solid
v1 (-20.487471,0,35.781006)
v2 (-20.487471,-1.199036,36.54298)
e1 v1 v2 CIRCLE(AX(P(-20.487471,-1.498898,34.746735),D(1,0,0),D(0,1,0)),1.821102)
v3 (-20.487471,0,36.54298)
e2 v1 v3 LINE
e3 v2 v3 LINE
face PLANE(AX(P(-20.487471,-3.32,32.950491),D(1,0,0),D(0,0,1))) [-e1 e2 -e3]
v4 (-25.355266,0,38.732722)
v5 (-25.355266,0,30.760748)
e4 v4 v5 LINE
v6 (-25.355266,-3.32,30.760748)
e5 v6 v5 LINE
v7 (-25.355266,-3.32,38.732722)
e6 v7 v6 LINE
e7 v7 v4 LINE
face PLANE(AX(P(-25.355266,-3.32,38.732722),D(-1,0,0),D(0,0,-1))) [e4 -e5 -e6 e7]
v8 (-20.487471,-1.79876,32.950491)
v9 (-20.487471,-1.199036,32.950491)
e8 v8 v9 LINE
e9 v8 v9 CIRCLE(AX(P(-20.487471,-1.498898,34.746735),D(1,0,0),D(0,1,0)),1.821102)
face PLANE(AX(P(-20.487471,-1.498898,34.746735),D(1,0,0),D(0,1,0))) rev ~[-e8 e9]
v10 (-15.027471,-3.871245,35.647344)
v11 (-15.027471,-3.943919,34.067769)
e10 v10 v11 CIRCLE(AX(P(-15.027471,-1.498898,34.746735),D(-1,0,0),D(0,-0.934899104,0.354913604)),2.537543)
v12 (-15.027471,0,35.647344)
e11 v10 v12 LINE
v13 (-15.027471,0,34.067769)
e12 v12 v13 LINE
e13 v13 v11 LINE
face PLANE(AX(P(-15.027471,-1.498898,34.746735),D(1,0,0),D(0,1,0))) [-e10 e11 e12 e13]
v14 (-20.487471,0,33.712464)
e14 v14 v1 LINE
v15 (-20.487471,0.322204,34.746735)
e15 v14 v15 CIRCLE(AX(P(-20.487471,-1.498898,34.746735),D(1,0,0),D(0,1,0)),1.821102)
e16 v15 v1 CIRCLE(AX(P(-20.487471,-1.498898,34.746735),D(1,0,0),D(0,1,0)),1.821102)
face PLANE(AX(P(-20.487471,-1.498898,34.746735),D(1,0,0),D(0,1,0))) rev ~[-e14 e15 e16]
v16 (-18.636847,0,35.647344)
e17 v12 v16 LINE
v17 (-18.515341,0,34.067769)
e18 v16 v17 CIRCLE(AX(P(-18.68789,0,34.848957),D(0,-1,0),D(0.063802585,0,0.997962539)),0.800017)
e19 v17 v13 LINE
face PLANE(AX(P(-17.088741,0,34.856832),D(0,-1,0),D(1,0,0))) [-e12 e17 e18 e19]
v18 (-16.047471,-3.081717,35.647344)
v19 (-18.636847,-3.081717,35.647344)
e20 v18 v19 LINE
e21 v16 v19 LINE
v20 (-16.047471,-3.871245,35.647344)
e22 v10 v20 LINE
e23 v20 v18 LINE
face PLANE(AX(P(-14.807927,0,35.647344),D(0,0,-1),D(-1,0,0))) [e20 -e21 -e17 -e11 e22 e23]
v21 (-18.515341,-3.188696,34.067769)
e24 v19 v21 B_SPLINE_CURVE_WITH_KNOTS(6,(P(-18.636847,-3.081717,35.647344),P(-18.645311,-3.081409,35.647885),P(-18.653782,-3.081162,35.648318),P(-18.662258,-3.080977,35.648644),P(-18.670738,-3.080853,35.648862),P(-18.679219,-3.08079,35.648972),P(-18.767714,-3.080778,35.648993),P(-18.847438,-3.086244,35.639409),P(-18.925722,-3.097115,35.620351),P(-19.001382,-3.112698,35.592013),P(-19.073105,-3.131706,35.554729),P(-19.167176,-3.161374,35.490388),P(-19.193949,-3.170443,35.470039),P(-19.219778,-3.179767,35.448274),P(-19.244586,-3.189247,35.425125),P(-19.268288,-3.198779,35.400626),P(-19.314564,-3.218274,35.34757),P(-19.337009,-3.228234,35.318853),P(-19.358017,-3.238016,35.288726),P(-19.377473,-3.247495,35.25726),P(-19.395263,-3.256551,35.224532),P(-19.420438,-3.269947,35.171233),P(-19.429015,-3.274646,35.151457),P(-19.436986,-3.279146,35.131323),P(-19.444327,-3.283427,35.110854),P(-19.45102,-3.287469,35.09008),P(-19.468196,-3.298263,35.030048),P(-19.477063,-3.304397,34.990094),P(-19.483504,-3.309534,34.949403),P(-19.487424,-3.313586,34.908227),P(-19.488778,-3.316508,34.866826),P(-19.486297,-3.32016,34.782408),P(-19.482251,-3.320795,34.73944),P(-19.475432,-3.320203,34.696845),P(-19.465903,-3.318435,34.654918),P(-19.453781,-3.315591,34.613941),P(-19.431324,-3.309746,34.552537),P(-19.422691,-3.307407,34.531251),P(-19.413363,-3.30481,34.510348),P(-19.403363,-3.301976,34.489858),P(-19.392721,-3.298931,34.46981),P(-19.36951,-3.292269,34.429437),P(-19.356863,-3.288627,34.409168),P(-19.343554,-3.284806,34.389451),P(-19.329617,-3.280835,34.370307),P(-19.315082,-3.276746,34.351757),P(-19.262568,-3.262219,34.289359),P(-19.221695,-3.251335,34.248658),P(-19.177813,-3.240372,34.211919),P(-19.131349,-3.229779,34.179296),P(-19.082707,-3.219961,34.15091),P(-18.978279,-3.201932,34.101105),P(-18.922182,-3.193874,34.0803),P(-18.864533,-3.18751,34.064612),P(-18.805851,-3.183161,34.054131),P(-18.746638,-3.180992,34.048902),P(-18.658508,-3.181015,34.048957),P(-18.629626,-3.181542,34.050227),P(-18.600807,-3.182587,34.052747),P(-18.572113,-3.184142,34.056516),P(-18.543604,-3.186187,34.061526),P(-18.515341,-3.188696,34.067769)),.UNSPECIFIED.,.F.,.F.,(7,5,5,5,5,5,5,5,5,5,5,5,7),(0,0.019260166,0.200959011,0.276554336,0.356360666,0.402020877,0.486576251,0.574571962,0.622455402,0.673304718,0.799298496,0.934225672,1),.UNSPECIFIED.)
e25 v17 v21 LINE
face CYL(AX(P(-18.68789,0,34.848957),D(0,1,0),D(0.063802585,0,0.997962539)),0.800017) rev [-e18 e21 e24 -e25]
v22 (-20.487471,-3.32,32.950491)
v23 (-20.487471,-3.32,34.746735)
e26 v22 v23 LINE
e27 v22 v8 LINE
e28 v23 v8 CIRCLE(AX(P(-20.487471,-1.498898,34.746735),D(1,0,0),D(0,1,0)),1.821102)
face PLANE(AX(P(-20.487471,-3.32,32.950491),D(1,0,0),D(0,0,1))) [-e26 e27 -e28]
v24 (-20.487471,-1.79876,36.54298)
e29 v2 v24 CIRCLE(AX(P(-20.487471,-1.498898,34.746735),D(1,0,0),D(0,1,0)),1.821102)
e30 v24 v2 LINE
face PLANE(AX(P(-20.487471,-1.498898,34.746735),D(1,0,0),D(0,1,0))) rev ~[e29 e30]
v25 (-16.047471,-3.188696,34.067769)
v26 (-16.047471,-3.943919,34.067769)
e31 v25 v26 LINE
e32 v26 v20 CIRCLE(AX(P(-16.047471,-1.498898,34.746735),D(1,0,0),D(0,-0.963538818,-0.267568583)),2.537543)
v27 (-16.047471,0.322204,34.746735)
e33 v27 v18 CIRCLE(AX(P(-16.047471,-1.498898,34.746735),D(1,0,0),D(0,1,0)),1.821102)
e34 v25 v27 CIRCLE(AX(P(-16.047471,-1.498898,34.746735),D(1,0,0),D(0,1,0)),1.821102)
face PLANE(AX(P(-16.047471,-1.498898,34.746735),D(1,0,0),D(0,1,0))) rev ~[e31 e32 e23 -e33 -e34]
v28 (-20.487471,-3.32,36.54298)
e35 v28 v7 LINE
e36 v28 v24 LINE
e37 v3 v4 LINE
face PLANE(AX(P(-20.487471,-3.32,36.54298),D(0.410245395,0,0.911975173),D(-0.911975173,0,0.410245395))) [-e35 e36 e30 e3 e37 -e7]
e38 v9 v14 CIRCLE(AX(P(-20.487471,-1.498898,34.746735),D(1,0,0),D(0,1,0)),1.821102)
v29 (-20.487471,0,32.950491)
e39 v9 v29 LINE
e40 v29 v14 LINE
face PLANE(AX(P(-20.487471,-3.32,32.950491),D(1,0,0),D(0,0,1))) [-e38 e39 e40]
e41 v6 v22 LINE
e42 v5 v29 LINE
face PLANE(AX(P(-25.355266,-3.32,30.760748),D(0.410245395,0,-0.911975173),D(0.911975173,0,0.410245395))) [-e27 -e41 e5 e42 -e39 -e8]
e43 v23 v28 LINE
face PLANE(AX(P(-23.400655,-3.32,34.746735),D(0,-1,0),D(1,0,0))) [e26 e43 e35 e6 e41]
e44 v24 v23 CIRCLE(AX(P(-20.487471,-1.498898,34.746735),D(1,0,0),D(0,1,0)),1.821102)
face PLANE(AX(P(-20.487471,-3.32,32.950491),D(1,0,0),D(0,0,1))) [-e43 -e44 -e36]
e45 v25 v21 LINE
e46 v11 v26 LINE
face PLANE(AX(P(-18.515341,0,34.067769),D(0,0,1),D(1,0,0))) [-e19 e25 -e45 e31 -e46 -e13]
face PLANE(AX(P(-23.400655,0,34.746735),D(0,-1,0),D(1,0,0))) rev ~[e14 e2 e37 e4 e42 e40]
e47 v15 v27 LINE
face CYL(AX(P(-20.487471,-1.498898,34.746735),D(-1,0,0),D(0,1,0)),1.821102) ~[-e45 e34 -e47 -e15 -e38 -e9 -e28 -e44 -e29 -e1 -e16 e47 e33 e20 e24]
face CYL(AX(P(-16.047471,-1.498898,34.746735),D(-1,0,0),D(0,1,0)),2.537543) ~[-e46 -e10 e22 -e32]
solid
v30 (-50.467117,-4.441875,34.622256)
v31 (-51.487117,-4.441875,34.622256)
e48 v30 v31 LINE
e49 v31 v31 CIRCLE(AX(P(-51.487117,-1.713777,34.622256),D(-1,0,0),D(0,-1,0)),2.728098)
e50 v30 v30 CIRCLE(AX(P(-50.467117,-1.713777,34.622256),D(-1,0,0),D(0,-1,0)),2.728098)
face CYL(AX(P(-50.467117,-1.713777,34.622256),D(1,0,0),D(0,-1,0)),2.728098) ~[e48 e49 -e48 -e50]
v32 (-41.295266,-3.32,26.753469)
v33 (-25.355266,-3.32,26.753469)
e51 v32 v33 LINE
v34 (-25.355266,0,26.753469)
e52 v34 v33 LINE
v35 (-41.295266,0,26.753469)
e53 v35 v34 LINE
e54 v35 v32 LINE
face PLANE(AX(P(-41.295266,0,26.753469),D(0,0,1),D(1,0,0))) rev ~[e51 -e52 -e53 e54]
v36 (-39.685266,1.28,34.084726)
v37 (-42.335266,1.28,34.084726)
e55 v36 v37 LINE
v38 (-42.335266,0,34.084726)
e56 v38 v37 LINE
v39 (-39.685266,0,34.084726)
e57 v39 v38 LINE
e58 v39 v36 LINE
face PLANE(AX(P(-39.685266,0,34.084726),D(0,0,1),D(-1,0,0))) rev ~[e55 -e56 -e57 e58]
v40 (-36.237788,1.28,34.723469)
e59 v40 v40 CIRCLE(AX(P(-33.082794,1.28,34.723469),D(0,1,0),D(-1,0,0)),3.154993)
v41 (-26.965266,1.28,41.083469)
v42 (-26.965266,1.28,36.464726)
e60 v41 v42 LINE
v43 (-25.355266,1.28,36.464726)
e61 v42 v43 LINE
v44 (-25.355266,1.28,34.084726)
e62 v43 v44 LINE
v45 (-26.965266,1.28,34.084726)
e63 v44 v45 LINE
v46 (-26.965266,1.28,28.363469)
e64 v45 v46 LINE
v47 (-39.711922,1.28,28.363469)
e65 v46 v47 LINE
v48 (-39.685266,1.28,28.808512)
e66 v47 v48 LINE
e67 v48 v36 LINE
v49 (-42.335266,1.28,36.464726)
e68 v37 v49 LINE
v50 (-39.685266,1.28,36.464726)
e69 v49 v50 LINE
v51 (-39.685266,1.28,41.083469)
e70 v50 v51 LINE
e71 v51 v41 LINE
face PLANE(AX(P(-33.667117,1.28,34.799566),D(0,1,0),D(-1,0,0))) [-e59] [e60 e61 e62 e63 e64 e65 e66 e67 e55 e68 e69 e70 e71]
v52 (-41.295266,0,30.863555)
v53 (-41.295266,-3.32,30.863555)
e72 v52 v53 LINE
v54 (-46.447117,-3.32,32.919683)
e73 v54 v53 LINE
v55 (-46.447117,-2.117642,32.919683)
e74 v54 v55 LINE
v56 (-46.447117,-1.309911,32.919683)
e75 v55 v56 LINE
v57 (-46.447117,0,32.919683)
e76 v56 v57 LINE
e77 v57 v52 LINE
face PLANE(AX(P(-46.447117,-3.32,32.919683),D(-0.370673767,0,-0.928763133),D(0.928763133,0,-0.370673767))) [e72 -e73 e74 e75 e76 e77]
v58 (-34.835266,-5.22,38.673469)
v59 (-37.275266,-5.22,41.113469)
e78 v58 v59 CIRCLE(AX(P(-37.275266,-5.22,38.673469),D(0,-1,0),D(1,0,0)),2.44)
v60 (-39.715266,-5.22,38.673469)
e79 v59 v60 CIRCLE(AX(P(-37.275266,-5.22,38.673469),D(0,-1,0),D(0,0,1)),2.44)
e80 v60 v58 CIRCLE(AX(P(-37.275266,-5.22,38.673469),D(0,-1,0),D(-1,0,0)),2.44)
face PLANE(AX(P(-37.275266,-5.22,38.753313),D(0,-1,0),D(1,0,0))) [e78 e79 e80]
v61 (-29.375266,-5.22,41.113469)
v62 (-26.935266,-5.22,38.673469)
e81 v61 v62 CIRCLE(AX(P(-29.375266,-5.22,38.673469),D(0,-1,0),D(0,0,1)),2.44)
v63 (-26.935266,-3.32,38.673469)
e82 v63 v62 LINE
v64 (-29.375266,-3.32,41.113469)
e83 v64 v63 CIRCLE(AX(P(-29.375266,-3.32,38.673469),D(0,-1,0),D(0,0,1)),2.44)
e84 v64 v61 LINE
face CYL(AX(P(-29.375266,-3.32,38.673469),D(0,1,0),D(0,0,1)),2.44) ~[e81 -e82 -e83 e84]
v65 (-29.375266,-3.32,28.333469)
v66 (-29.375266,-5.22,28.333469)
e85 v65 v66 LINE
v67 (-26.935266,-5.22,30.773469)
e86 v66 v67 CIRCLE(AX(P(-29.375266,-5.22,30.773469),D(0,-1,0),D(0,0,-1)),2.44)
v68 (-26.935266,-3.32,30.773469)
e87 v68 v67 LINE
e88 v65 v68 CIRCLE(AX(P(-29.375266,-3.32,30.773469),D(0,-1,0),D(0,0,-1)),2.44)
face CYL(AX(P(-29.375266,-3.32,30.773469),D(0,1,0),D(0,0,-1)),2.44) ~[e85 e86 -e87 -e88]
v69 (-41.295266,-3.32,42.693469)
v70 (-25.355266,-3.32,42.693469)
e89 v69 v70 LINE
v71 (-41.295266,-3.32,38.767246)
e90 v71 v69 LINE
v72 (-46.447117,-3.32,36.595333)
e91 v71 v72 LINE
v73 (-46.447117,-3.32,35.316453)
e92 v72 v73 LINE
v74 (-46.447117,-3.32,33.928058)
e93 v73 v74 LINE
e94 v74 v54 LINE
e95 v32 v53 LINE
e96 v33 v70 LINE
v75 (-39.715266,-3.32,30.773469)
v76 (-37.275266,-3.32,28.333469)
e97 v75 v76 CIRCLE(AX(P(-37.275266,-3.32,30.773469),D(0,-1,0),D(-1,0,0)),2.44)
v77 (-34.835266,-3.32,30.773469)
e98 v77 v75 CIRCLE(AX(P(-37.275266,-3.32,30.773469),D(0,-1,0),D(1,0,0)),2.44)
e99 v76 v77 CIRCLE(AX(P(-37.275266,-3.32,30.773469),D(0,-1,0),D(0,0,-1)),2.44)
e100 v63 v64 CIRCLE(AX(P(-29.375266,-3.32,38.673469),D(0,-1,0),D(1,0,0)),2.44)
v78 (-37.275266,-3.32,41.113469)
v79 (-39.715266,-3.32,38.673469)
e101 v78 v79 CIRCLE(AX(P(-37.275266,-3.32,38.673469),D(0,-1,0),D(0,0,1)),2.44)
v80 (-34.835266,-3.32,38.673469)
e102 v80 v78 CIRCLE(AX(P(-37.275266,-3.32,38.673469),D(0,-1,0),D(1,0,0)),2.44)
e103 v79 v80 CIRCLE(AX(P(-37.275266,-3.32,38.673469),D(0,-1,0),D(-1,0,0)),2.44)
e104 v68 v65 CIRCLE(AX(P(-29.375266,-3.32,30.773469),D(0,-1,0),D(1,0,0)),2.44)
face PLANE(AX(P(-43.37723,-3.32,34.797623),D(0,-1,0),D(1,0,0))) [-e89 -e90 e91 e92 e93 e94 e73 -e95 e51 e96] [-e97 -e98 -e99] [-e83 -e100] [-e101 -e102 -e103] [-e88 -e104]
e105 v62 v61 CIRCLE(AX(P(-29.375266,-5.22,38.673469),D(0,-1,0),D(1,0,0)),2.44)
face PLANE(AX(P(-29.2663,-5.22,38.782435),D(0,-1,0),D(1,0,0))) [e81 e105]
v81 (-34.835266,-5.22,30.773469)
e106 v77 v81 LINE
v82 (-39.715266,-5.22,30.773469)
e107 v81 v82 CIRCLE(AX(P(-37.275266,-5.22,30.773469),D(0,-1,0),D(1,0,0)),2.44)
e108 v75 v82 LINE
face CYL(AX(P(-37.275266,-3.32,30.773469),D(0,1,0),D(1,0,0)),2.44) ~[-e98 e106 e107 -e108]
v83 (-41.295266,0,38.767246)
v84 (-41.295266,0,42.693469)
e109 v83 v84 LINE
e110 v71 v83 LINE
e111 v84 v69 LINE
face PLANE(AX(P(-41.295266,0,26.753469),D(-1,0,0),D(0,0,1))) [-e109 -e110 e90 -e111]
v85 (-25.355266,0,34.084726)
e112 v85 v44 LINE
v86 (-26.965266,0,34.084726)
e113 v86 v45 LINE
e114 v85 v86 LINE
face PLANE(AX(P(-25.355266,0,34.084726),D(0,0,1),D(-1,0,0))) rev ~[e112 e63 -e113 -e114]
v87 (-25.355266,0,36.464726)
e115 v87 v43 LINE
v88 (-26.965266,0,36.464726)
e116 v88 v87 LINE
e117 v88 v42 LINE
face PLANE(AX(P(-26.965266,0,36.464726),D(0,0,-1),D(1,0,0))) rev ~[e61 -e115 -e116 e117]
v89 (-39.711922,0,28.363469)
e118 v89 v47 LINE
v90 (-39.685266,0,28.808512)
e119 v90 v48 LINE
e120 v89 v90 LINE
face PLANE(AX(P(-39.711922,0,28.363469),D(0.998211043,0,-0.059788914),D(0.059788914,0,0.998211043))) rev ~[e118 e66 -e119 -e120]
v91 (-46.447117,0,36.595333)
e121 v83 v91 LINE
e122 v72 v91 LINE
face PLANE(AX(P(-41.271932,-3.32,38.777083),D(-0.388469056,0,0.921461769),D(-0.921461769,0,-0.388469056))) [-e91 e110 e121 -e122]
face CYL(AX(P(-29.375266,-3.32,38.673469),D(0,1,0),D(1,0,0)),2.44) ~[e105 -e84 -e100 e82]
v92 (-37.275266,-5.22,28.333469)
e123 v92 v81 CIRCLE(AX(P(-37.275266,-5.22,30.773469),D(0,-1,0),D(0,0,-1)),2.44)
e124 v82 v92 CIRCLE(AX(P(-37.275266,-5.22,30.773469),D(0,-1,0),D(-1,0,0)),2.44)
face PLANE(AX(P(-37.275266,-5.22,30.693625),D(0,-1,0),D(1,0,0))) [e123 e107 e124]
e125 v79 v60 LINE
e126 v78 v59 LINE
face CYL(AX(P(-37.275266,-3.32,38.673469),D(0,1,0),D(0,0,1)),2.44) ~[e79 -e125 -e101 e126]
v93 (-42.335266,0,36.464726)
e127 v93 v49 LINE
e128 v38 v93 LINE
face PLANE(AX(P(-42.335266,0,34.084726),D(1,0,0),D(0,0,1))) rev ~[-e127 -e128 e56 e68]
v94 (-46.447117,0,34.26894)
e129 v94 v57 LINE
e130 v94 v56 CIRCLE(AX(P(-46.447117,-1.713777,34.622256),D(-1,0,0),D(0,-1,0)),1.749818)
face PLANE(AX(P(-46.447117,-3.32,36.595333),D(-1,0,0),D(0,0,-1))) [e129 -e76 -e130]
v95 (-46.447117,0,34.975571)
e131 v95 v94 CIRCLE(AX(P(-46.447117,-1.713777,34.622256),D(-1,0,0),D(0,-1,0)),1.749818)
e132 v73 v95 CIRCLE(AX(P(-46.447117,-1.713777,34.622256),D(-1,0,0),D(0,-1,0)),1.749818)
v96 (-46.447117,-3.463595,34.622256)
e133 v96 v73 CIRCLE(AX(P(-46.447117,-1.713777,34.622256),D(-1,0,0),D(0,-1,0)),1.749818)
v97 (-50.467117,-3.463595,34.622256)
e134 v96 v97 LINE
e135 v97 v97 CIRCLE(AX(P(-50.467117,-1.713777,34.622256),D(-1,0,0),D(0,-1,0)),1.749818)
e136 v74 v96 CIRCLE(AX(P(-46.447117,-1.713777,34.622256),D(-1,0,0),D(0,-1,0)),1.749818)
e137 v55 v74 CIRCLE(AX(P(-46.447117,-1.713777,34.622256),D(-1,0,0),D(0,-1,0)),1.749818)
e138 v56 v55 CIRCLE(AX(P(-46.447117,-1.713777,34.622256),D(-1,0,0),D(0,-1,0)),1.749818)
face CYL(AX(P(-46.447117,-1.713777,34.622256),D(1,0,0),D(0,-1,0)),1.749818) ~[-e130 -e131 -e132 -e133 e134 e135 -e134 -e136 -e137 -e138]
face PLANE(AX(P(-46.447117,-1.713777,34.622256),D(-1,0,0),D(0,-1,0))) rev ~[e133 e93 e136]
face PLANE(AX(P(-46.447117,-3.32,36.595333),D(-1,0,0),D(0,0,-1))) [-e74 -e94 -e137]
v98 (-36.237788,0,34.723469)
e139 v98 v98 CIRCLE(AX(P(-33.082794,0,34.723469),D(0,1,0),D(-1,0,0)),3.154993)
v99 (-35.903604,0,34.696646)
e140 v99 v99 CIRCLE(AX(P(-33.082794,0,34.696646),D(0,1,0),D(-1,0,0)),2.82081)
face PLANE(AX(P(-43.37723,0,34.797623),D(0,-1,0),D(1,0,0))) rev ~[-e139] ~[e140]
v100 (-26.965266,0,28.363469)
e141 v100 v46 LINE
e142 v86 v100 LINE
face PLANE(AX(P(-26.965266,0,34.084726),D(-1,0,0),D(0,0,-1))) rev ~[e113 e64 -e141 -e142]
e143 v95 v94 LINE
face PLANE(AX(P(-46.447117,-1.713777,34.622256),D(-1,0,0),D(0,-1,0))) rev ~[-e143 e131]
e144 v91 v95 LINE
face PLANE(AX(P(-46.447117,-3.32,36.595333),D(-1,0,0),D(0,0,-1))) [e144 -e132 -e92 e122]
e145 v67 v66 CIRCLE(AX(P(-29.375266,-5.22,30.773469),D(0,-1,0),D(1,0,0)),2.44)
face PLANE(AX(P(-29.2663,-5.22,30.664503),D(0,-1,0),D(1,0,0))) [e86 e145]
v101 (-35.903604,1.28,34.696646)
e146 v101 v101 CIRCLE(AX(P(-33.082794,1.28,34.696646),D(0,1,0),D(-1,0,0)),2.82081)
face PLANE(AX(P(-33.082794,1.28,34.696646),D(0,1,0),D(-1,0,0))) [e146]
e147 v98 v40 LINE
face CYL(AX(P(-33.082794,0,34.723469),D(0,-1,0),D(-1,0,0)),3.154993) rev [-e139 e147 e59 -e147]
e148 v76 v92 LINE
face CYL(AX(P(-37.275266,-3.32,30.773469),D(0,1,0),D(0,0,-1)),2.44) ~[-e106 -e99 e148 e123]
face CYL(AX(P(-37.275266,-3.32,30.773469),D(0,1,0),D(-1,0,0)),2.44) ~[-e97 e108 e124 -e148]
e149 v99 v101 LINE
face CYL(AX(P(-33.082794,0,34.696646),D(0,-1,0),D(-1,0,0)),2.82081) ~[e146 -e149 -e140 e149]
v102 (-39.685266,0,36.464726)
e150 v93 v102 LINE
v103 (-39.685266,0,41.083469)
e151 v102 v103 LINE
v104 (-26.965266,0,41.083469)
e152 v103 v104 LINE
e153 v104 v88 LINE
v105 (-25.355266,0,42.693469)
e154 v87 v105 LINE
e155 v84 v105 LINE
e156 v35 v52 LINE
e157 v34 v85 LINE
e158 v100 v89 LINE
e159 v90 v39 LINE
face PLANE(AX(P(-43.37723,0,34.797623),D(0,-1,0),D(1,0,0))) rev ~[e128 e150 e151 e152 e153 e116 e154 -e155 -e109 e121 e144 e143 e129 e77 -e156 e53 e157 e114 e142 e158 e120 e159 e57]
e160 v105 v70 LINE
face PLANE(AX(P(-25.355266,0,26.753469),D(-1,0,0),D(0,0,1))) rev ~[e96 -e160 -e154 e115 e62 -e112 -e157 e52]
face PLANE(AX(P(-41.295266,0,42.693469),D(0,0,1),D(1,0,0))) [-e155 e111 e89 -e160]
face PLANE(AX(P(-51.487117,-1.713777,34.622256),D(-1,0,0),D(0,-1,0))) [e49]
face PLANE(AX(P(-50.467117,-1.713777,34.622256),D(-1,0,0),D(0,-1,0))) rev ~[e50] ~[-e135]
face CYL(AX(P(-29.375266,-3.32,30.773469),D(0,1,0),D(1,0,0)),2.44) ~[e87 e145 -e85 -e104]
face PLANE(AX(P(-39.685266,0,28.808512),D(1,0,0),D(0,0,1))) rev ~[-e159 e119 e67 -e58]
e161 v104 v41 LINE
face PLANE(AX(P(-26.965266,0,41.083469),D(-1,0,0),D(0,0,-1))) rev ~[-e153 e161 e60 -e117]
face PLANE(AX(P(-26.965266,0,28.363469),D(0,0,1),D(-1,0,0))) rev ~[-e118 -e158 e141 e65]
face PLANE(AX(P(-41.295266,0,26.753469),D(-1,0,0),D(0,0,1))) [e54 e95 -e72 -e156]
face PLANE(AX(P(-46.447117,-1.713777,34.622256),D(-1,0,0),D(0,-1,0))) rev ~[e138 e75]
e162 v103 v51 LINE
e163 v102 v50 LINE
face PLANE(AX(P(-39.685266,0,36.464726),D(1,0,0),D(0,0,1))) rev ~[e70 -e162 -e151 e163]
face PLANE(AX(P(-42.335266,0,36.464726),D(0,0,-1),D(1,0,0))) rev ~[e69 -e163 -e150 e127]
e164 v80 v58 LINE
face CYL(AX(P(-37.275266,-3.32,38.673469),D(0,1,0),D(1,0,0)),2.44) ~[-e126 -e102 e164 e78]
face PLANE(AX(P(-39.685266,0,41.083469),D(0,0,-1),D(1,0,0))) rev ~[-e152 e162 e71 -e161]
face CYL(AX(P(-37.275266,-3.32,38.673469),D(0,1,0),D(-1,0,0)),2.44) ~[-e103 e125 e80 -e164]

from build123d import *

# Parameters (mm, degrees)
F0_W      = 15.94
F0_H      = 15.94
F1_DEPTH  = 3.32
F3_DEPTH  = 1.9
F5_DEPTH  = 3.32
F6_R      = 1.821101858
F7_DEPTH  = 4.44
F8_R      = 2.5375428774
F9_DEPTH  = 1.02
F10_W     = 0.2336027101
F10_H     = 1.5795752406
F11_DEPTH = 6
F14_DEPTH = 3.32
F15_R     = 1.749817918
F16_DEPTH = 4.02
F17_R     = 2.7280982188
F18_DEPTH = 1.02
F19_R     = 3.15499311
F19_R_2   = 2.8208099917
F20_DEPTH = 1.28


# Not quite as in the source:
# - a feature names something its author has since deleted; it is built from what else it names


with BuildPart() as f1:
    # F0 (on Front) → F1 (new body)
    with BuildSketch(Plane.XZ):
        with Locations((-33.325266093, 34.7234688458)):
            Rectangle(F0_W, F0_H)
    extrude(amount=F1_DEPTH)

    # F2 (on face) → F3 (join)
    with BuildSketch(Plane.XZ.offset(3.32)):
        with BuildLine():
            ThreePointArc((-39.715266093, 38.6734688458), (-37.275266093, 36.2334688458), (-34.835266093, 38.6734688458))
            ThreePointArc((-34.835266093, 38.6734688458), (-35.5499255469, 40.3988093919), (-37.275266093, 41.1134688458))
            ThreePointArc((-37.275266093, 41.1134688458), (-39.0006066391, 40.3988093919), (-39.715266093, 38.6734688458))
        make_face()
        with BuildLine():
            ThreePointArc((-29.375266093, 41.1134688458), (-31.1006066391, 36.9481282997), (-26.935266093, 38.6734688458))
            ThreePointArc((-26.935266093, 38.6734688458), (-27.6499255469, 40.3988093919), (-29.375266093, 41.1134688458))
        make_face()
        with BuildLine():
            ThreePointArc((-37.275266093, 28.3334688458), (-35.5499255469, 29.0481282997), (-34.835266093, 30.7734688458))
            ThreePointArc((-34.835266093, 30.7734688458), (-37.275266093, 33.2134688458), (-39.715266093, 30.7734688458))
            ThreePointArc((-39.715266093, 30.7734688458), (-39.0006066391, 29.0481282997), (-37.275266093, 28.3334688458))
        make_face()
        with BuildLine():
            ThreePointArc((-29.375266093, 28.3334688458), (-27.6499255469, 29.0481282997), (-26.935266093, 30.7734688458))
            ThreePointArc((-26.935266093, 30.7734688458), (-31.1006066391, 32.4988093919), (-29.375266093, 28.3334688458))
        make_face()
    extrude(amount=F3_DEPTH)

    # F13 (on face) → F14 (join)
    with BuildSketch(Plane.XZ.offset(3.32)):
        Polygon((-46.4471168816, 36.5953333676), (-46.4471168816, 32.9196825624), (-41.2719324231, 30.8542419225), (-41.2719324231, 38.7770831585), align=None)
    extrude(amount=-F14_DEPTH)

    # F15 (on face) → F16 (join)
    with BuildSketch(Plane(origin=(-46.4471168816, 0, 0), x_dir=(0, -1, 0), z_dir=(-1, 0, 0))):
        with Locations((1.7137768446, 34.6222557127)):
            Circle(F15_R)
    extrude(amount=F16_DEPTH)

    # F17 (on face) → F18 (join)
    with BuildSketch(Plane(origin=(-50.4671168816, 0, 0), x_dir=(0, -1, 0), z_dir=(-1, 0, 0))):
        with Locations((1.7137768446, 34.6222557127)):
            Circle(F17_R)
    extrude(amount=F18_DEPTH)

    # F19 (on face) → F20 (join)
    with BuildSketch(Plane(origin=(0, 0, 0), x_dir=(-1, 0, 0), z_dir=(0, 1, 0))):
        Polygon((39.685266093, 41.0834688458), (26.965266093, 41.0834688458), (26.965266093, 36.464726125), (25.355266093, 36.464726125), (25.355266093, 34.084726125), (26.965266093, 34.084726125), (26.965266093, 29.2574396769), (26.965266093, 28.3634688458), (39.7119224072, 28.3634688458), (39.685266093, 28.8085116733), (39.685266093, 34.084726125), (42.335266093, 34.084726125), (42.335266093, 36.464726125), (39.685266093, 36.464726125), align=None)
        with Locations((33.0827943981, 34.7234688458)):
            Circle(F19_R, mode=Mode.SUBTRACT)
        with Locations((33.0827943981, 34.6966460347)):
            Circle(F19_R_2)
    extrude(amount=F20_DEPTH)


with BuildPart() as f5:
    # F4 (on face) → F5 (new body)
    with BuildSketch(Plane.XZ.offset(3.32)):
        Polygon((-20.4874705523, 36.5429800004), (-25.355266093, 38.7327224016), (-25.355266093, 30.7607483119), (-20.4874705523, 32.9504907131), align=None)
    extrude(amount=-F5_DEPTH)

    # F6 (on face) → F7 (join)
    with BuildSketch(Plane.YZ.offset(-20.4874705523)):
        with Locations((-1.498898142, 34.7467353567)):
            Circle(F6_R)
    extrude(amount=F7_DEPTH)

    # F8 (on face) → F9 (join)
    with BuildSketch(Plane.YZ.offset(-16.0474705523)):
        with Locations((-1.498898142, 34.7467353567)):
            Circle(F8_R)
    extrude(amount=F9_DEPTH)

    # F10 (on Front) → F11 (cut)
    with BuildSketch(Plane.XZ):
        with BuildLine():
            Line((-15.0415301323, 35.6473438442), (-18.6368469149, 35.6473438442))
            ThreePointArc((-18.6368469149, 35.6473438442), (-19.4855509584, 34.7875979099), (-18.5153409839, 34.0677686036))
            Line((-18.5153409839, 34.0677686036), (-15.0415301323, 34.0677686036))
            Line((-15.0415301323, 34.0677686036), (-15.0415301323, 35.6473438442))
        make_face()
        with Locations((-14.9247287773, 34.8575562239)):
            Rectangle(F10_W, F10_H)
    extrude(amount=F11_DEPTH, mode=Mode.SUBTRACT)


solid = Compound([f1.part, f5.part])
